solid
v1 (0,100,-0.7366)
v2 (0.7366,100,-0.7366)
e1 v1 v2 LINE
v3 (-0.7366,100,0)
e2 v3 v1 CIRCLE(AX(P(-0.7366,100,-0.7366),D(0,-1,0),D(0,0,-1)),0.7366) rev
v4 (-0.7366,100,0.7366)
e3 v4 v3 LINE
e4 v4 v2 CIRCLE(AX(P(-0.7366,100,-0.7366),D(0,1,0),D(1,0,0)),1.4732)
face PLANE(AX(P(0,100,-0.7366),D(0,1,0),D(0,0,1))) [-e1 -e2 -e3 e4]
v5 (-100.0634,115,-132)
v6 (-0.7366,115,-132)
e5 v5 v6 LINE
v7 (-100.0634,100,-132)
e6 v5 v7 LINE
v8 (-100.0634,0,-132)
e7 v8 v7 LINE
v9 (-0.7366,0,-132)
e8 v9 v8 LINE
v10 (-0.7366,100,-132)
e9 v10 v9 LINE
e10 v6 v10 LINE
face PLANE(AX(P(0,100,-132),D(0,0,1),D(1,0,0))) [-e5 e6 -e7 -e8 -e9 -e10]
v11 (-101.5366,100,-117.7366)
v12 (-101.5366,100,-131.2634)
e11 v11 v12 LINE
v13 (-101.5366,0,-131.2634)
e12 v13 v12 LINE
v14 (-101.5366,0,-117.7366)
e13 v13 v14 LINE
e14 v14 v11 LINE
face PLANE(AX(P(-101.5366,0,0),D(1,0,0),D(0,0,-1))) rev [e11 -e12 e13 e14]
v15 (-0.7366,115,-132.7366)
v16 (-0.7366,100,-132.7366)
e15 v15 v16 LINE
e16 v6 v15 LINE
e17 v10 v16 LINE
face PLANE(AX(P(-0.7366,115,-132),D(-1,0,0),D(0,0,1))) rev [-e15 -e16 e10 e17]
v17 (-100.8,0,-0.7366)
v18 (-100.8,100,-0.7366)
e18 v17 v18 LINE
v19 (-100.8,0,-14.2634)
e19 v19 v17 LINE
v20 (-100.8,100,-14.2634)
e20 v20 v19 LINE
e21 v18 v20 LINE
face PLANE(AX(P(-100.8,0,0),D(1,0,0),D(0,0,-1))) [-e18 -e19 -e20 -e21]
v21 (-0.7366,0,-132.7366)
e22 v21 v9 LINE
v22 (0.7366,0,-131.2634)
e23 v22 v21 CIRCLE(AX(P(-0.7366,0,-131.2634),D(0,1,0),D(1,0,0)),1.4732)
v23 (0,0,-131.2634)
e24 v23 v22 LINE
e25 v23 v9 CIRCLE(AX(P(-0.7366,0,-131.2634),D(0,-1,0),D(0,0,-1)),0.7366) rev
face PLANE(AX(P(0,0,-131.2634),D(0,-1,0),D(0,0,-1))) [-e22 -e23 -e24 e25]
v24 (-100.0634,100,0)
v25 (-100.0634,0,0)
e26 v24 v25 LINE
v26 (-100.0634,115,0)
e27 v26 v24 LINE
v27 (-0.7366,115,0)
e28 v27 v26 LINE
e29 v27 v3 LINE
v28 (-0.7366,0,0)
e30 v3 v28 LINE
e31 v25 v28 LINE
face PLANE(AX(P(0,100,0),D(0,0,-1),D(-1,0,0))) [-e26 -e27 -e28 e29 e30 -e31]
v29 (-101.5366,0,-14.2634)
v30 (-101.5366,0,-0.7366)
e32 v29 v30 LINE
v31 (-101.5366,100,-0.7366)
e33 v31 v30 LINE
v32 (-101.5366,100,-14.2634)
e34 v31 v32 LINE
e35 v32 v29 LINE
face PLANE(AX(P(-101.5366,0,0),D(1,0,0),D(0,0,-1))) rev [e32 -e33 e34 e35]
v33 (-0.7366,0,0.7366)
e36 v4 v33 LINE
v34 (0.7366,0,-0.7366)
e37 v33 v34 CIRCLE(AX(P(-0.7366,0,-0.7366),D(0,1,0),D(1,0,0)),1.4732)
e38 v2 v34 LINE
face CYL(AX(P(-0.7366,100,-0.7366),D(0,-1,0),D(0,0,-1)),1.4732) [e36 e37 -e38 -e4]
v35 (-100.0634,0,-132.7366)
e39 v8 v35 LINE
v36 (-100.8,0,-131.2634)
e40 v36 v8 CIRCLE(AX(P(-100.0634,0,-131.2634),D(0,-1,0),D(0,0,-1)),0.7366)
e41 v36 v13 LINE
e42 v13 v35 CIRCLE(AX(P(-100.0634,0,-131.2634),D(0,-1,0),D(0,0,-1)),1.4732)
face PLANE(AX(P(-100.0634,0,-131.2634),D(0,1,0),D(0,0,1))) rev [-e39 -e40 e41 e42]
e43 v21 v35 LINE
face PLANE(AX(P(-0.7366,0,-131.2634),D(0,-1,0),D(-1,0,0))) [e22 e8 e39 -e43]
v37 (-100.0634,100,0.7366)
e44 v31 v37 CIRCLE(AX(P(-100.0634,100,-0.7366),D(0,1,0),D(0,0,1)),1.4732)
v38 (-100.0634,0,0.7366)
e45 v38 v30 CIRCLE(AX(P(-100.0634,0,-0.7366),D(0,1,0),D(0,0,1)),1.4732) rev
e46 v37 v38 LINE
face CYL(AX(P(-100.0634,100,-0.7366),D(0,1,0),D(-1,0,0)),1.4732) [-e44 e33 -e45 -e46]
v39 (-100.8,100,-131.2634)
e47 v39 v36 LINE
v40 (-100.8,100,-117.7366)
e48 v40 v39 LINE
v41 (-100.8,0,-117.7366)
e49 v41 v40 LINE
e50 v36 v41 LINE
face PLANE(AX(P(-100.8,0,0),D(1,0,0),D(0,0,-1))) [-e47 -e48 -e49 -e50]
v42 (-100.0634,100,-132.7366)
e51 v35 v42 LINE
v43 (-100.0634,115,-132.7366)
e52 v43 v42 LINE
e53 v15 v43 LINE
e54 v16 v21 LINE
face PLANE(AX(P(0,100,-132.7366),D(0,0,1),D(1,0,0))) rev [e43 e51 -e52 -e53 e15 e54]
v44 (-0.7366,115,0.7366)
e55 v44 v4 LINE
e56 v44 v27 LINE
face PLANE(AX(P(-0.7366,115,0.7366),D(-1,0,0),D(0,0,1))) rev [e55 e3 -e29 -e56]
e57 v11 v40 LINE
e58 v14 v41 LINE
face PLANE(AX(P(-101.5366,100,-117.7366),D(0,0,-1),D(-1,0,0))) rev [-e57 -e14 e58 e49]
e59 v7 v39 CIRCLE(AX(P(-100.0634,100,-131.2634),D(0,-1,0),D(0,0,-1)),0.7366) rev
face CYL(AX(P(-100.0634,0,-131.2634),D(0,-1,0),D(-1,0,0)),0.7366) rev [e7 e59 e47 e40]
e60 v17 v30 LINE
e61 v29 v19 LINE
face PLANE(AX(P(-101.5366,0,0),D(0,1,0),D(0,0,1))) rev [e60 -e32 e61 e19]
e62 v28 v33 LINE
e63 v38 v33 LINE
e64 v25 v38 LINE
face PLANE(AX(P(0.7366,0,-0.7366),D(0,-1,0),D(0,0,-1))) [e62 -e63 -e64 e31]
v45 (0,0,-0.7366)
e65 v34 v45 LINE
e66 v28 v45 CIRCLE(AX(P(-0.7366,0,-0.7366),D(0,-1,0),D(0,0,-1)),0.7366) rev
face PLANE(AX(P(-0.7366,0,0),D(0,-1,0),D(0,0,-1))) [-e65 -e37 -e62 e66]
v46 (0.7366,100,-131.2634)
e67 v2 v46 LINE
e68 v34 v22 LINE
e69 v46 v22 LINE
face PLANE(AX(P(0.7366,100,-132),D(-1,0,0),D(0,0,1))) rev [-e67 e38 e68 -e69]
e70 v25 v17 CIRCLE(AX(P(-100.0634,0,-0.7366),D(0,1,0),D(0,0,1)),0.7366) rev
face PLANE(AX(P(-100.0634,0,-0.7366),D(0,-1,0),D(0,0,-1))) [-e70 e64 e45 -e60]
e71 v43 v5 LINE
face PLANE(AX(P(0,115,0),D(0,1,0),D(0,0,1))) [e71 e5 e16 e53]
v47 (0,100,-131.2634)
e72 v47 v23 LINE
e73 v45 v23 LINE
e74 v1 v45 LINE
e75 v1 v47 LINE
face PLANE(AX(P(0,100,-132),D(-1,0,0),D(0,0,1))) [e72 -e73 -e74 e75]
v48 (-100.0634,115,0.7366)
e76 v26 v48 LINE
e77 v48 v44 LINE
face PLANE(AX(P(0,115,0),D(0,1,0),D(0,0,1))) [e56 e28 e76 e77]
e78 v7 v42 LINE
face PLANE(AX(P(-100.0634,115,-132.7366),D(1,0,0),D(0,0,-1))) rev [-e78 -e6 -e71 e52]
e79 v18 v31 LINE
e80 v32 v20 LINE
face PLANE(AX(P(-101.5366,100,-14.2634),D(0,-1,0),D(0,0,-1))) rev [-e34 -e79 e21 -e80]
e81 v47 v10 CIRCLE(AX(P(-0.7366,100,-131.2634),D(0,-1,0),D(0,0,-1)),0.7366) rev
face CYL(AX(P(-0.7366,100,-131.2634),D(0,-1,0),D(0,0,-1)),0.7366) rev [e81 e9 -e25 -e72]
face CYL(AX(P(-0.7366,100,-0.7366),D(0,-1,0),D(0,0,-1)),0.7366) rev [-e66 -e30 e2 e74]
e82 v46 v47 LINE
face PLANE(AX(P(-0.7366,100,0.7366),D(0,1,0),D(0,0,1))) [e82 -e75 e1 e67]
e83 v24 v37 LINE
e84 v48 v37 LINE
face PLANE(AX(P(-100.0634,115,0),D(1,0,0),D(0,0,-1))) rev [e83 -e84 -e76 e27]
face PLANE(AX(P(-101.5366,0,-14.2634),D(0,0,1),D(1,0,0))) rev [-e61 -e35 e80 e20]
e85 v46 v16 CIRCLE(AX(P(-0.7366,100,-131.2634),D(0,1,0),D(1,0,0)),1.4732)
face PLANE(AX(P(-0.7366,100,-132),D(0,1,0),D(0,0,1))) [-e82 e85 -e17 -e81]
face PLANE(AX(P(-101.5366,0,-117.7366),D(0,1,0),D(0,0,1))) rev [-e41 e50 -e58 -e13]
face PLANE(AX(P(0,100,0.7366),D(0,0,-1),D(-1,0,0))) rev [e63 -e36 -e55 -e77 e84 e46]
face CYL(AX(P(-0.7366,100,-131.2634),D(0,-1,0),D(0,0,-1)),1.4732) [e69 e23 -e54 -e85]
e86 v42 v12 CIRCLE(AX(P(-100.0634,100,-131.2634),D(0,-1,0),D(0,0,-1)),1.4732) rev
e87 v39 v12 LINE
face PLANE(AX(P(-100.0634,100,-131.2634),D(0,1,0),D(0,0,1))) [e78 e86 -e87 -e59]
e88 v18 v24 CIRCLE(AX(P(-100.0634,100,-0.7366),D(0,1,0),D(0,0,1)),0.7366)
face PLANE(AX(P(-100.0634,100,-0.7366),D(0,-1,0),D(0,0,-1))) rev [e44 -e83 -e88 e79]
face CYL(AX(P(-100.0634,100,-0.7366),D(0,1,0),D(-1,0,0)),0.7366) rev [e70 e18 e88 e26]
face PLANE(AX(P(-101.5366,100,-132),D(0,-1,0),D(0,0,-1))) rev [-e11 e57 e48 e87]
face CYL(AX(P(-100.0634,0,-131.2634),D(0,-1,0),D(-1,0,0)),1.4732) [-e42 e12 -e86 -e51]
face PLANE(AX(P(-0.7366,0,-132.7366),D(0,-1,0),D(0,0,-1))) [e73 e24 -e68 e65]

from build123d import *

# Parameters (mm, degrees)
BASE_FLANGE1_DEPTH      = 100
EDGE_FLANGE1_DEPTH      = 100
EDGE_FLANGE1_BEND_DEPTH = 100
SKETCH8_W               = 99.3268
SKETCH8_H               = 0.7366
BOSS_EXTRUDE1_DEPTH     = 15


# Sheet-metal steps are written as plain solids
with BuildPart() as part:
    # Sketch1 → Base-Flange1 (new body)
    with BuildSketch(Plane(origin=(0, 0, 0), x_dir=(1, 0, 0), z_dir=(0, 1, 0))):
        with BuildLine():
            Line((-100, 132), (-0.7366, 132))
            ThreePointArc((-0.7366, 132), (-0.215745145, 131.784254855), (0, 131.2634))
            Line((0, 131.2634), (0, 0.7366))
            ThreePointArc((0, 0.7366), (-0.215745145, 0.215745145), (-0.7366, 0))
            Line((-0.7366, 0), (-100, 0))
            Line((-100, 0), (-100, -0.7366))
            Line((-100, -0.7366), (-0.7366, -0.7366))
            ThreePointArc((-0.7366, -0.7366), (0.30510971, -0.30510971), (0.7366, 0.7366))
            Line((0.7366, 0.7366), (0.7366, 131.2634))
            ThreePointArc((0.7366, 131.2634), (0.30510971, 132.30510971), (-0.7366, 132.7366))
            Line((-0.7366, 132.7366), (-100, 132.7366))
            Line((-100, 132.7366), (-100, 132))
        make_face()
    extrude(amount=BASE_FLANGE1_DEPTH)

    # Edge-Flange1 section (across the edge) → Edge-Flange1 (add)
    with BuildSketch(Plane(origin=(-100.8, 100, -132), x_dir=(1, 0, 0), z_dir=(0, -1, 0))):
        with BuildLine():
            Line((-0.7366, 0.7366), (-0.7366, 14.2634))
            Line((-0.7366, 14.2634), (0, 14.2634))
            Line((0, 14.2634), (0, 0.7366))
            ThreePointArc((0, 0.7366), (0.215745145, 0.215745145), (0.7366, 0))
            Line((0.7366, 0), (0.8, 0))
            Line((0.8, 0), (0.8, -0.7366))
            Line((0.8, -0.7366), (0.7366, -0.7366))
            ThreePointArc((0.7366, -0.7366), (-0.30510971, -0.30510971), (-0.7366, 0.7366))
        make_face()
    extrude(amount=EDGE_FLANGE1_DEPTH)

    # Edge-Flange1 section 2 (across the edge) → Edge-Flange1 bend (add)
    with BuildSketch(Plane(origin=(-100.8, 0, 0), x_dir=(1, 0, 0), z_dir=(0, 1, 0))):
        with BuildLine():
            Line((-0.7366, 0.7366), (-0.7366, 14.2634))
            Line((-0.7366, 14.2634), (0, 14.2634))
            Line((0, 14.2634), (0, 0.7366))
            ThreePointArc((0, 0.7366), (0.215745145, 0.215745145), (0.7366, 0))
            Line((0.7366, 0), (0.8, 0))
            Line((0.8, 0), (0.8, -0.7366))
            Line((0.8, -0.7366), (0.7366, -0.7366))
            ThreePointArc((0.7366, -0.7366), (-0.30510971, -0.30510971), (-0.7366, 0.7366))
        make_face()
    extrude(amount=EDGE_FLANGE1_BEND_DEPTH)

    # Sketch8 → Boss-Extrude1 (add)
    with BuildSketch(Plane(origin=(0, 100, 0), x_dir=(1, 0, 0), z_dir=(0, 1, 0))):
        with Locations((-50.4, -0.3683)):
            Rectangle(SKETCH8_W, SKETCH8_H)
        with Locations((-50.4, 132.3683)):
            Rectangle(SKETCH8_W, SKETCH8_H)
    extrude(amount=BOSS_EXTRUDE1_DEPTH)


solid = part.part
